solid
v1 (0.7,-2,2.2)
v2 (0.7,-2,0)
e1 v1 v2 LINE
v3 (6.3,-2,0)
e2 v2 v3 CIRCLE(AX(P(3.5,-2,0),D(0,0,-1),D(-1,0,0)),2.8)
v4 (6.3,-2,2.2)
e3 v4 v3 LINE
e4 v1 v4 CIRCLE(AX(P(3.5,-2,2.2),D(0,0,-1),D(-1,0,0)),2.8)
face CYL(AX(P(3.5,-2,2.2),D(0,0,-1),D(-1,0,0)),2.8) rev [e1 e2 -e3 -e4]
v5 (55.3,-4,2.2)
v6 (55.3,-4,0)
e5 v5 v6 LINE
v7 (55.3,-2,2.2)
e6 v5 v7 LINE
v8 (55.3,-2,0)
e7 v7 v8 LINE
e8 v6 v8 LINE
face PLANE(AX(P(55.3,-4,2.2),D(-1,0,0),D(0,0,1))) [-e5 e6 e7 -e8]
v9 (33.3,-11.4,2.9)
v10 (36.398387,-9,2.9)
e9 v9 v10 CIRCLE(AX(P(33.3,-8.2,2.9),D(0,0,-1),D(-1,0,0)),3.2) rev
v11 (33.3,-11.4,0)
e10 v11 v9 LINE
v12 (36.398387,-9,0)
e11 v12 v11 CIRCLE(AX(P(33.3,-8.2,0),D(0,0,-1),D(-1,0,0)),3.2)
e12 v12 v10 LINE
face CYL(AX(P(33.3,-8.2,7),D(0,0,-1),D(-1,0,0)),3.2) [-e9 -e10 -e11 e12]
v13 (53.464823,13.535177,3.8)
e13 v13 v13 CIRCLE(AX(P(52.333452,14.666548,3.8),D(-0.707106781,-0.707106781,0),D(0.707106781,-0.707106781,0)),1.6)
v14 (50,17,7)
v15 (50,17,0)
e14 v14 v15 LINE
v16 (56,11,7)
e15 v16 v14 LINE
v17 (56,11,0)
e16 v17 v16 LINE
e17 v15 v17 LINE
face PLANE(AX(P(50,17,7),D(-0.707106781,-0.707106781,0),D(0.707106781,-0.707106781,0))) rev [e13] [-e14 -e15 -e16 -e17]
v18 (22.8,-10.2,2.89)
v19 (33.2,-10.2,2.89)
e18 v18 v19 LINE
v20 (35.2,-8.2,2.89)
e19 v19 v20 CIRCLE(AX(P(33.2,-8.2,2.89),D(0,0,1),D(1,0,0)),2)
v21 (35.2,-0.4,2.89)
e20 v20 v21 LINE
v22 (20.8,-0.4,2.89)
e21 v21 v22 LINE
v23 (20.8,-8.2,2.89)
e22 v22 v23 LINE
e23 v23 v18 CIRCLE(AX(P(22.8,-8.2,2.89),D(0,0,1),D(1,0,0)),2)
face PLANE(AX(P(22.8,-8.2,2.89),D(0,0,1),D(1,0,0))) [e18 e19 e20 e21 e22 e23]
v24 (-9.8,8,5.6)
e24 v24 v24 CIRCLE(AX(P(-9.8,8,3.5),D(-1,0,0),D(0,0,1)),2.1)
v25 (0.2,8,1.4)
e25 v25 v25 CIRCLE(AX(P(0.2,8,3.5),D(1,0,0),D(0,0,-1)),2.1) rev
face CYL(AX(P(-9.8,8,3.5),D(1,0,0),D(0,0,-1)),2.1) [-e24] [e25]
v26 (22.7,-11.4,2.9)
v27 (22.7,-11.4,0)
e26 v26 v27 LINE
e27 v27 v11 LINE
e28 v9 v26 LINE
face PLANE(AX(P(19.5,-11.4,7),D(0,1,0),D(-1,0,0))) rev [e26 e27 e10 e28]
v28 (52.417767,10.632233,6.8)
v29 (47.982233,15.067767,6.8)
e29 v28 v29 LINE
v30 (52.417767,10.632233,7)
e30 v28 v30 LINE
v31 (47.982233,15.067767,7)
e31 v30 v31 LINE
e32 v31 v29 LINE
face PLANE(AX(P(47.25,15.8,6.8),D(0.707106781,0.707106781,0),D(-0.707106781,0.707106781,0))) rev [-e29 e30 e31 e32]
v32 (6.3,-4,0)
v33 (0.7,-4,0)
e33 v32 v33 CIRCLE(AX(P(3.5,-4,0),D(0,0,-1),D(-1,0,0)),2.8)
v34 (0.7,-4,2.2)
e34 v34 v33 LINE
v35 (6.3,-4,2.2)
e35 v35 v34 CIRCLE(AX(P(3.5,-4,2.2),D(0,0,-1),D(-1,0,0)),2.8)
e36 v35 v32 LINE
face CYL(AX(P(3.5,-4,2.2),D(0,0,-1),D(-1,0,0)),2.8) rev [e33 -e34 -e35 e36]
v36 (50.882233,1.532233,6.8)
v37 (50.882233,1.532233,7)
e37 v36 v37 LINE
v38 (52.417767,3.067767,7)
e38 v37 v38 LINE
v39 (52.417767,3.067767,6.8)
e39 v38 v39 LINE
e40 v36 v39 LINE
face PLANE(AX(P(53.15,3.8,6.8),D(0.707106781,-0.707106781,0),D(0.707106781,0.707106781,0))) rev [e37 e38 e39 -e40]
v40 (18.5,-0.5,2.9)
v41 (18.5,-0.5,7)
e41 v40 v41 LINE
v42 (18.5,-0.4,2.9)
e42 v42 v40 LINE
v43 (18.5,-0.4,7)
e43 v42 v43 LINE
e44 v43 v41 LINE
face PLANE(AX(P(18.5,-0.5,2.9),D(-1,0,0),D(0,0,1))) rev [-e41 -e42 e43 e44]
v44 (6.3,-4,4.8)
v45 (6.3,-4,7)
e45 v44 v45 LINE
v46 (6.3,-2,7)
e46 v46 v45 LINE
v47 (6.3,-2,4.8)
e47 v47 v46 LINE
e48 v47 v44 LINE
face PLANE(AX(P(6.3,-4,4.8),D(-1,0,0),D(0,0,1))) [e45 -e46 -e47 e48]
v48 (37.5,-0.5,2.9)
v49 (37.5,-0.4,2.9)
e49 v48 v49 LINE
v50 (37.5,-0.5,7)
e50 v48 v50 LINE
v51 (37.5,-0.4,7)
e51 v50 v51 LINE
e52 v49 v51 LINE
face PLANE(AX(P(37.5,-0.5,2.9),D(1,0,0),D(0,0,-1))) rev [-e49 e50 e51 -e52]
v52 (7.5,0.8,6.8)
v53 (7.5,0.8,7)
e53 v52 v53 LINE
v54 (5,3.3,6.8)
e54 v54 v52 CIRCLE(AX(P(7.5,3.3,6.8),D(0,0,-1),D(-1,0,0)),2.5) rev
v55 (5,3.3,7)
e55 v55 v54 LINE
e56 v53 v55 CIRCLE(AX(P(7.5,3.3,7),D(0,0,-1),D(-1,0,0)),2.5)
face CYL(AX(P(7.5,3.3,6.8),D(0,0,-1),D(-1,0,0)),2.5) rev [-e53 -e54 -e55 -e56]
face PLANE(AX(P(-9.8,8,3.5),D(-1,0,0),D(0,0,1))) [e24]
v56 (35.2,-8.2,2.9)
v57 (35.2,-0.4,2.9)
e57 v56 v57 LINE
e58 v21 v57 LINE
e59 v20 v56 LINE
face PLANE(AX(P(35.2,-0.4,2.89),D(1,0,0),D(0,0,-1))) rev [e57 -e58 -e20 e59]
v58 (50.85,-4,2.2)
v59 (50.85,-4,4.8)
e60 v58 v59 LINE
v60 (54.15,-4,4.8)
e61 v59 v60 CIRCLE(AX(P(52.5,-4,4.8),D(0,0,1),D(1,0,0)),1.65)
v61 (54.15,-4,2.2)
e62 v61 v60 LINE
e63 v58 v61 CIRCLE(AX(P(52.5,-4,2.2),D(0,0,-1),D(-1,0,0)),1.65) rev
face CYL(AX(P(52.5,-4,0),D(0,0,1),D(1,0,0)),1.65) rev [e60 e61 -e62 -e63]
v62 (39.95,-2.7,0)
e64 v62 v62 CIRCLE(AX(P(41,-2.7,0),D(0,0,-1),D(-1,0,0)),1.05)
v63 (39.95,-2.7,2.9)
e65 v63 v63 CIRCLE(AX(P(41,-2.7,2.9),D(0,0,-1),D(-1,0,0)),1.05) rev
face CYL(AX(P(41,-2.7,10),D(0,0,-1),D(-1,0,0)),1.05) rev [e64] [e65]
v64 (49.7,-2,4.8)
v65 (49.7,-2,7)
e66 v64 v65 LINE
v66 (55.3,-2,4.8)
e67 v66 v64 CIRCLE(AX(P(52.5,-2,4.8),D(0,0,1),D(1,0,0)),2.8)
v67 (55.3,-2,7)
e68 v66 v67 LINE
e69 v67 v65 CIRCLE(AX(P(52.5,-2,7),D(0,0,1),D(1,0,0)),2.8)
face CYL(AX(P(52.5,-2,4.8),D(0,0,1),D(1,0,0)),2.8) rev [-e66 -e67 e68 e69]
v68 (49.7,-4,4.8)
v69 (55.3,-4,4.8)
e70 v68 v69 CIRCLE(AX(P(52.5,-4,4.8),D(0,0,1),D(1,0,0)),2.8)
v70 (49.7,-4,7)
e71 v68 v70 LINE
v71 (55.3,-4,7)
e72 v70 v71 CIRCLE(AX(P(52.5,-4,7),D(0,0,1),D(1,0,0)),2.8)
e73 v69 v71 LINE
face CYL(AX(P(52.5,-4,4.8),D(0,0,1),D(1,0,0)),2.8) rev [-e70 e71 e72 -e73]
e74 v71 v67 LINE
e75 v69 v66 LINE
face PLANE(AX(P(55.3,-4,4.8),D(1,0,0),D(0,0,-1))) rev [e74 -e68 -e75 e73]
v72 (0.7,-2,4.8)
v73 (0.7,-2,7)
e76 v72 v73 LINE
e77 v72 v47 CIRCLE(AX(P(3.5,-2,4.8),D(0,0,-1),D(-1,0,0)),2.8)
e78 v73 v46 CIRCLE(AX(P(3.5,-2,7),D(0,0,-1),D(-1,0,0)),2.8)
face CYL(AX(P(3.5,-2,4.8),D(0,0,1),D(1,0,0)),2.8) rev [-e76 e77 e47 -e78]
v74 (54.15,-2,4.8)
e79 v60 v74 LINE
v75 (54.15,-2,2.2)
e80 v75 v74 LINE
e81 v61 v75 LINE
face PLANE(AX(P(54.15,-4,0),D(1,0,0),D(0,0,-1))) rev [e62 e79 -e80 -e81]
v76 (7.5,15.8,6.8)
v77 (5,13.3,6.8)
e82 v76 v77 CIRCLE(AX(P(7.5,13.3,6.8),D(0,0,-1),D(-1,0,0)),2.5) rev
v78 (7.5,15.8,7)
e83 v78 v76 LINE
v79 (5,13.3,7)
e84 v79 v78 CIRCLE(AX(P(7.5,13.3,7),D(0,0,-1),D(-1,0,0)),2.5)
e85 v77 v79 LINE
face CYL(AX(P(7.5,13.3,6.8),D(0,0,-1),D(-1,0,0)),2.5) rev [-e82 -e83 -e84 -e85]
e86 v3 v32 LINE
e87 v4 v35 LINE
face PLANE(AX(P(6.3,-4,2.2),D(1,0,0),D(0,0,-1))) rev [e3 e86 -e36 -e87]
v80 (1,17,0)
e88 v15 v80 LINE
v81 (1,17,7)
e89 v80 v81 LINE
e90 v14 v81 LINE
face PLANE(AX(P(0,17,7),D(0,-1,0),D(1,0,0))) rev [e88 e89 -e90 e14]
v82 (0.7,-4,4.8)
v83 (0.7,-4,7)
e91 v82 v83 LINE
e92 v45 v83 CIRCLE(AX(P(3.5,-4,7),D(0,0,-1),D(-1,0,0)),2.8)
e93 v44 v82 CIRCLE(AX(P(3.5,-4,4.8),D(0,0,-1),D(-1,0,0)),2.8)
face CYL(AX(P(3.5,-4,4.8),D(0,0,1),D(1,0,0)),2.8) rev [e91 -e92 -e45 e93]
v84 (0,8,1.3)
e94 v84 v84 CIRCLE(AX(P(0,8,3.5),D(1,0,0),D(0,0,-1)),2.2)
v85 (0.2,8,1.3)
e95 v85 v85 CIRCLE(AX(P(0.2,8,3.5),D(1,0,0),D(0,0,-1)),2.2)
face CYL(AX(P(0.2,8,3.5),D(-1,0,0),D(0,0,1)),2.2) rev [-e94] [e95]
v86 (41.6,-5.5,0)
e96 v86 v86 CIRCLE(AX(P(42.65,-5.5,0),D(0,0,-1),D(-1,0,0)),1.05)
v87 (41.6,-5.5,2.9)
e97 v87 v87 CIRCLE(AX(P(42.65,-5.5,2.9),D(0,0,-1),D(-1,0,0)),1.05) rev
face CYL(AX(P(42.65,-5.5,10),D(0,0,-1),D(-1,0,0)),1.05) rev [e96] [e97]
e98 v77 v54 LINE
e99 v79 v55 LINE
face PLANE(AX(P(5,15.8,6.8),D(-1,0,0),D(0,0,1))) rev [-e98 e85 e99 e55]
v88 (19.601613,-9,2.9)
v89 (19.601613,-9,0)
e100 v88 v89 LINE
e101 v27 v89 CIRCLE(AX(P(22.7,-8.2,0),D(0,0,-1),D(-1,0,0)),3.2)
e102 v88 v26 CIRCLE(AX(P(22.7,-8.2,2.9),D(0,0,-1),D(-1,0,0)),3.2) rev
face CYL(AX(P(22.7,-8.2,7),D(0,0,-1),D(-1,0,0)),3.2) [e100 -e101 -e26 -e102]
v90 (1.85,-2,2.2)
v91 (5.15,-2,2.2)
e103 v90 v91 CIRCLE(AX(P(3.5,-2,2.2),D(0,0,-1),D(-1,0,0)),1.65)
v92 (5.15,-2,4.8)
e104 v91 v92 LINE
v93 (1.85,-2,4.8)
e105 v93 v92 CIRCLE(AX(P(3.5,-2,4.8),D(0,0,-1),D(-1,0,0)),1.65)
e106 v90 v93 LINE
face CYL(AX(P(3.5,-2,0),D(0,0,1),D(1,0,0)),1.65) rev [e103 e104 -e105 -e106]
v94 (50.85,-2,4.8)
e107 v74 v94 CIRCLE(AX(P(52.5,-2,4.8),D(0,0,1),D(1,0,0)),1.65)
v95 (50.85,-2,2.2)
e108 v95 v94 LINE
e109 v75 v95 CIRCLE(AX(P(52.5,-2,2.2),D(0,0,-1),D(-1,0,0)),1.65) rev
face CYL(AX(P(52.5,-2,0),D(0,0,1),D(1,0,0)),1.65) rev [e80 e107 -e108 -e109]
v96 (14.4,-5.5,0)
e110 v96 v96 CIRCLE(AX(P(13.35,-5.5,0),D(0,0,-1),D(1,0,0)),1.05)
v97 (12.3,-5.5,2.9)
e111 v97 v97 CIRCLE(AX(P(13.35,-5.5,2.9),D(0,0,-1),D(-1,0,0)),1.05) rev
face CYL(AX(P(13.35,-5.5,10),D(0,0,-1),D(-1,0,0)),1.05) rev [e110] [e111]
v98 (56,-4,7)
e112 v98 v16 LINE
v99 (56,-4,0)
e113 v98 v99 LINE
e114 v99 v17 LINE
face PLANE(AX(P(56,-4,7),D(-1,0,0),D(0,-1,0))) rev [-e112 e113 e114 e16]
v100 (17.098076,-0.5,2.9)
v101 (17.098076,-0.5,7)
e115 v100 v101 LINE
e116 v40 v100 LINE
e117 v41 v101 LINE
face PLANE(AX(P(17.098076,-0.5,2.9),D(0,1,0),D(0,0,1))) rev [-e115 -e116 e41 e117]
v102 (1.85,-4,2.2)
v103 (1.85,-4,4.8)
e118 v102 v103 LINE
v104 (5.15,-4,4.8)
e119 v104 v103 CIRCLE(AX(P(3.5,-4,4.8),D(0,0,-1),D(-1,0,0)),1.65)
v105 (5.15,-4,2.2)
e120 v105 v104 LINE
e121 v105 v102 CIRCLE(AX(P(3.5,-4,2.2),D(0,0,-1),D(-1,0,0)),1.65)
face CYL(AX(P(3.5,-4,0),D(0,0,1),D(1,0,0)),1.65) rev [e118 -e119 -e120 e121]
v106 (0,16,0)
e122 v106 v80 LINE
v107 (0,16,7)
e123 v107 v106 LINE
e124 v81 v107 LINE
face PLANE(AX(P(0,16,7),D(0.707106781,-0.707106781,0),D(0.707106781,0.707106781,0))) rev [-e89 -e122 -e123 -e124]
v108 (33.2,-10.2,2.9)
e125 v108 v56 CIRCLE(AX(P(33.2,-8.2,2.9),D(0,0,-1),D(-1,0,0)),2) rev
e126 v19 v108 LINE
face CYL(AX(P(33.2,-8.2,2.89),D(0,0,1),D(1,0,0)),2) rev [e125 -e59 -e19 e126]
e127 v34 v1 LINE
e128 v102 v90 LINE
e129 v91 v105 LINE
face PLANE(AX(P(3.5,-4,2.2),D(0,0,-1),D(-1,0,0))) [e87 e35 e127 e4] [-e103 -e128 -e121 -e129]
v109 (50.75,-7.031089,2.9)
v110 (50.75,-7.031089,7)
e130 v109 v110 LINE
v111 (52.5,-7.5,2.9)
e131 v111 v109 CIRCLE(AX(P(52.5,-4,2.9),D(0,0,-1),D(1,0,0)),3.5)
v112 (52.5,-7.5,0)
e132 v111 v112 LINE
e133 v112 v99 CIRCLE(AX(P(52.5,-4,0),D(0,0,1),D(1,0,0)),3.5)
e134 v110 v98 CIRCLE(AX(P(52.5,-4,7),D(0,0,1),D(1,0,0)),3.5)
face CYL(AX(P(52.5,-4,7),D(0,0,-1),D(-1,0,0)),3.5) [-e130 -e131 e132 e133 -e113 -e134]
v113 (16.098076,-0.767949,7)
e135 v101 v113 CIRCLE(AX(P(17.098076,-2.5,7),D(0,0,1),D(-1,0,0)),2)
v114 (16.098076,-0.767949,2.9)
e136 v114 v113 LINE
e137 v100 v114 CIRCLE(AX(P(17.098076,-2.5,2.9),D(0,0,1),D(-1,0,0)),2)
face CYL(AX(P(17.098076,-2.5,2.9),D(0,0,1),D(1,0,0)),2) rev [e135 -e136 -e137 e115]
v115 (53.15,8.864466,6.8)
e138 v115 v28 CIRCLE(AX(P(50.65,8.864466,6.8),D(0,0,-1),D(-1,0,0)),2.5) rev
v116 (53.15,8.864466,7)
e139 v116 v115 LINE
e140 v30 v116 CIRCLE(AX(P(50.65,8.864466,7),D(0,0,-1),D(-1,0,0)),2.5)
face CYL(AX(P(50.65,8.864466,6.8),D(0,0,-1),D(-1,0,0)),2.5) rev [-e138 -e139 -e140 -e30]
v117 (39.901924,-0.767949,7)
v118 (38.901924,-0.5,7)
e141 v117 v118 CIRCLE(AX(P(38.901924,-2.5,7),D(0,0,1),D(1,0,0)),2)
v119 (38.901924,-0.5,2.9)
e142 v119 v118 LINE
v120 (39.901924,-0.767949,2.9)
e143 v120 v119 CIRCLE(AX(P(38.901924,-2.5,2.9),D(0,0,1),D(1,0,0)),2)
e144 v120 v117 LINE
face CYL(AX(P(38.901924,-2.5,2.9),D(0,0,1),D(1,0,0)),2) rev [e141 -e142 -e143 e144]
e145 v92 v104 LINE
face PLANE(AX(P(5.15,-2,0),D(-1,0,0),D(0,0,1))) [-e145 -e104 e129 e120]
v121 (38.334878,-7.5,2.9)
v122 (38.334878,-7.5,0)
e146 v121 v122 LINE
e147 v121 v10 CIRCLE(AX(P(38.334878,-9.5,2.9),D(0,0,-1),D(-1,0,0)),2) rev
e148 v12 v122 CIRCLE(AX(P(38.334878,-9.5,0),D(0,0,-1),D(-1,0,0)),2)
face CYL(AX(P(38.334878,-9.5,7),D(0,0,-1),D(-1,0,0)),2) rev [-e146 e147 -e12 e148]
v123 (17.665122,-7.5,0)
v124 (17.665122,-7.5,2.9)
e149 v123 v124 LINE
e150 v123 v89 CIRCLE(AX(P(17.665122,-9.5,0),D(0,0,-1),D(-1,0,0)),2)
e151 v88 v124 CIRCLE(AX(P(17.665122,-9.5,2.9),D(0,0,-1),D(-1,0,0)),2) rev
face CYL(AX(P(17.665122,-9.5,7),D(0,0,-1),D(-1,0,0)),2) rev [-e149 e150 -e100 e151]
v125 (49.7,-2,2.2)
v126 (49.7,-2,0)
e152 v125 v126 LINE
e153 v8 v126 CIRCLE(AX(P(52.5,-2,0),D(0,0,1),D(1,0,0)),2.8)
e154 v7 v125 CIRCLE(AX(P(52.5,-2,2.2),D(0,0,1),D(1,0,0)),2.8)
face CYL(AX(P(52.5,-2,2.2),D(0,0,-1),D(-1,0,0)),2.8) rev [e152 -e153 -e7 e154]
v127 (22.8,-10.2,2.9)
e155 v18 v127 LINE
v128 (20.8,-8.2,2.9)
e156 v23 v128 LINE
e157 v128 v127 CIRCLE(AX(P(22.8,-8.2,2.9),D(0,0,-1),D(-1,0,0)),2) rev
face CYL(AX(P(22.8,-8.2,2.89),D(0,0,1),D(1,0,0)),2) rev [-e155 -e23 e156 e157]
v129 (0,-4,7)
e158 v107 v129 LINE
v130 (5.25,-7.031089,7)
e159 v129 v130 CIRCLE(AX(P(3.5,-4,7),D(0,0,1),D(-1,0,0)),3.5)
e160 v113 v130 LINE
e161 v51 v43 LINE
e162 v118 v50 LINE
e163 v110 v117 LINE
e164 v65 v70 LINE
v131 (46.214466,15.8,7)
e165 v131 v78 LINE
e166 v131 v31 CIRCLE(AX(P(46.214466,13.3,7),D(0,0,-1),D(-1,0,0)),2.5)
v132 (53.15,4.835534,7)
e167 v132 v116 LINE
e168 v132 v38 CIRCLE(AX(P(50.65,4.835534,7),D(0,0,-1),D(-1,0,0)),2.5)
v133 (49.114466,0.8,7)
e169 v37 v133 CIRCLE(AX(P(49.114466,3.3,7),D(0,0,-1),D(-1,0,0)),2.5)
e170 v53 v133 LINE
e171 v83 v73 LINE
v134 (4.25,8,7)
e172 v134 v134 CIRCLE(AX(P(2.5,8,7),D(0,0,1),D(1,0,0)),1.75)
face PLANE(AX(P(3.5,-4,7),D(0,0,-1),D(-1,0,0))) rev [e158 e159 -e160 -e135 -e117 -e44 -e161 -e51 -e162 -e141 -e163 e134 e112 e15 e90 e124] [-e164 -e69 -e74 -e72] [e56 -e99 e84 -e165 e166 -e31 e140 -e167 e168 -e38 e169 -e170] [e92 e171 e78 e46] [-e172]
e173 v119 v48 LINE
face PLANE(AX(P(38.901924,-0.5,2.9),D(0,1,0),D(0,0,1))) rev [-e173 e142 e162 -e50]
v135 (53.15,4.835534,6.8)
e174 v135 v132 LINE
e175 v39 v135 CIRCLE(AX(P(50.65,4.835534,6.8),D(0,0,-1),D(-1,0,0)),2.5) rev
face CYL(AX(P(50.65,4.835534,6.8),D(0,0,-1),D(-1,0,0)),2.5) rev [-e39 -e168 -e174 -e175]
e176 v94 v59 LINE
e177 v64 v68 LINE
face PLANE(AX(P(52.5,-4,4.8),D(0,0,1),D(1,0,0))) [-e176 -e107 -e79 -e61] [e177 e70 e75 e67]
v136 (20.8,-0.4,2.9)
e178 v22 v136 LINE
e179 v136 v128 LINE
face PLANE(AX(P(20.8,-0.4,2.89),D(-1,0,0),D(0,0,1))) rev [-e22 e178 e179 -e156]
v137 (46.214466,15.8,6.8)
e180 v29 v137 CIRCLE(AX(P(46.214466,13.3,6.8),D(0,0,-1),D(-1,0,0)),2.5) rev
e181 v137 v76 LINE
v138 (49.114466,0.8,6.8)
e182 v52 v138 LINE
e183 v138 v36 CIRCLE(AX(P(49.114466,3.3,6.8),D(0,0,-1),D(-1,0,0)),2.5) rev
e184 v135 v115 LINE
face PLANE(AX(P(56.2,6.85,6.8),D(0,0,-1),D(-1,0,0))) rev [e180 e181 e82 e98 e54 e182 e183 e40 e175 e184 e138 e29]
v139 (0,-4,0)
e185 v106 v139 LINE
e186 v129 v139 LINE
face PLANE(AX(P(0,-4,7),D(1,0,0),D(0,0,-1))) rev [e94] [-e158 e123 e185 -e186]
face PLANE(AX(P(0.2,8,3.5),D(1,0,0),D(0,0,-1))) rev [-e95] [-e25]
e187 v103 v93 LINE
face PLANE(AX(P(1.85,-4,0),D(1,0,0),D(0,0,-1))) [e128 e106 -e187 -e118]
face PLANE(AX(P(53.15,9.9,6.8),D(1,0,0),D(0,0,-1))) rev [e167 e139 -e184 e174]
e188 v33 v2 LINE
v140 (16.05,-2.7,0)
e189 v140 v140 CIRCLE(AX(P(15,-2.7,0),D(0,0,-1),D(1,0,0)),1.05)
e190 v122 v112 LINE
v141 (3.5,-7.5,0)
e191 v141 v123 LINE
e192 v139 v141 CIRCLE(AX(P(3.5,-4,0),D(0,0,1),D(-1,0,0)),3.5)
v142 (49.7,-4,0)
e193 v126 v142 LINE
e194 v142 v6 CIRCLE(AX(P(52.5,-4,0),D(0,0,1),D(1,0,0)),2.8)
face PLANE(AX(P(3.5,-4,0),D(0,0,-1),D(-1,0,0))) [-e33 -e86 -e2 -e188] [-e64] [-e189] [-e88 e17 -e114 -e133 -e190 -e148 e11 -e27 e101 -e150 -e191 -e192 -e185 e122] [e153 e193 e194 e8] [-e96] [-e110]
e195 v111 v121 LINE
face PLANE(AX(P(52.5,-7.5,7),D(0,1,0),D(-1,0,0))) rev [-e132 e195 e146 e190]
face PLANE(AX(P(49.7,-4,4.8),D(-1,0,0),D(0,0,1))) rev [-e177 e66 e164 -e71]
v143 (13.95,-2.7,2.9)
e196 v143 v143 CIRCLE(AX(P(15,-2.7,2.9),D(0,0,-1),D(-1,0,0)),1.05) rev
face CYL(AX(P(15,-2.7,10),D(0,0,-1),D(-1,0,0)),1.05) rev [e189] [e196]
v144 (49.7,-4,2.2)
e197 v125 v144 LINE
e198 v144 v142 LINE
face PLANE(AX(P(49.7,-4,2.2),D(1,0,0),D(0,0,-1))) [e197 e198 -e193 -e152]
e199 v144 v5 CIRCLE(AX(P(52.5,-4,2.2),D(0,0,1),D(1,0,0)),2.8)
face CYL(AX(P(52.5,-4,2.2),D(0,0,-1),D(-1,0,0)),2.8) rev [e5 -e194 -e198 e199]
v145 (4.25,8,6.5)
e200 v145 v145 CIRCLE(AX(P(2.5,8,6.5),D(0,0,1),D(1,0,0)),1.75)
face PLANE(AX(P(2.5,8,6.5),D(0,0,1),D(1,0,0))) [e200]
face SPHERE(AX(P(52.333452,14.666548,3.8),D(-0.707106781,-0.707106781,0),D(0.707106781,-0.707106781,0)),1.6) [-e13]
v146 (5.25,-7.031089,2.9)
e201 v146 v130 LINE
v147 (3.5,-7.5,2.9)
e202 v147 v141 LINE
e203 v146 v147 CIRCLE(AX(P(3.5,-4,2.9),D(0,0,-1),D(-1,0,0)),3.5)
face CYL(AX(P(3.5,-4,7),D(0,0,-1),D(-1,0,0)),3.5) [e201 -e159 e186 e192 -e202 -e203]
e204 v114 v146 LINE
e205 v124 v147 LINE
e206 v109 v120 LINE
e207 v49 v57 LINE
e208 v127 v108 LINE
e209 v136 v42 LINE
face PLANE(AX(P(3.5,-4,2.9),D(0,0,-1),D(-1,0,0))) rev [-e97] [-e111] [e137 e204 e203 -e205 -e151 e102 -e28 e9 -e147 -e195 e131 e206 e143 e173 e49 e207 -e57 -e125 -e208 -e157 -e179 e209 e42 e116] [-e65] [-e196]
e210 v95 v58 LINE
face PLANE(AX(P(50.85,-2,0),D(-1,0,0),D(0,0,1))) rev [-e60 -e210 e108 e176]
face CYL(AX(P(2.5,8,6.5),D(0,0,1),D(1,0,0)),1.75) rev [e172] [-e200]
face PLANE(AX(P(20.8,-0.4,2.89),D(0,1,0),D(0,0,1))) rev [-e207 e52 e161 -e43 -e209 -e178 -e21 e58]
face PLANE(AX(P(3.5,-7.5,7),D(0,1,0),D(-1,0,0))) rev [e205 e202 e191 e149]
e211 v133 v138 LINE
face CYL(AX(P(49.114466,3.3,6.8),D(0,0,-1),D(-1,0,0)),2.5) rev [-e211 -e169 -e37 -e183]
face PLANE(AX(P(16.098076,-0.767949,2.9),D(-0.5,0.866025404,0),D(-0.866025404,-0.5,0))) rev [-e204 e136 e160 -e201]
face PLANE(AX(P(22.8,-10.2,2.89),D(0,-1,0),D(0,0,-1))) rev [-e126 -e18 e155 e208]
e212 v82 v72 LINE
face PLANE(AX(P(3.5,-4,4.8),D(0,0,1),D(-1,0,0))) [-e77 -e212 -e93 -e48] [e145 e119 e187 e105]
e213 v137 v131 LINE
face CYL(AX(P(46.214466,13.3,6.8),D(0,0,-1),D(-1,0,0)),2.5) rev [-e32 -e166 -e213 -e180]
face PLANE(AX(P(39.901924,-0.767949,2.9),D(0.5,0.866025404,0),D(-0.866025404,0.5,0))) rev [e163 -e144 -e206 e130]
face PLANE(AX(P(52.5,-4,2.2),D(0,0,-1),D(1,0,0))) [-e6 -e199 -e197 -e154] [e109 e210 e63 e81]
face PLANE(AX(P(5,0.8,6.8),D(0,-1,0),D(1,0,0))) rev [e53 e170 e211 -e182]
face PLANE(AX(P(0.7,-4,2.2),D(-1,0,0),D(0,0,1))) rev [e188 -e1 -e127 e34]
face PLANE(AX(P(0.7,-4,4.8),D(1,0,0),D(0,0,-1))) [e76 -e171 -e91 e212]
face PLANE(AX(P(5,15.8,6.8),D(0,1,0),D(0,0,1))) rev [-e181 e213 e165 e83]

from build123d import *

# Parameters (mm, degrees)
BOSS_EXTRUDE1_DEPTH  = 7
CUT_EXTRUDE1_DEPTH   = 0.2
FILLET1_R            = 2.5
CHAMFER1_SIZE        = 6
CUT_EXTRUDE4_DEPTH   = 2.2
CUT_EXTRUDE5_DEPTH   = 59.720013624
SKETCH14_R           = 2.2
CUT_EXTRUDE9_DEPTH   = 0.2
CUT_EXTRUDE10_DEPTH  = 4.11
CHAMFER3_SIZE        = 1
FILLET3_R            = 3.2
SKETCH29_R           = 1.05
CUT_EXTRUDE16_DEPTH  = 10
FILLET5_R            = 2
FILLET6_R            = 2
MIRROR2_COPY_1_DEPTH = 2.2
SKETCH31_R           = 1.75
CUT_EXTRUDE17_DEPTH  = 0.5
CUT_EXTRUDE19_START  = -4.1
CUT_EXTRUDE19_DEPTH  = 4.1
SKETCH33_R           = 2.1
BOSS_EXTRUDE2_DEPTH  = 10


with BuildPart() as part:
    # Sketch1 → Boss-Extrude1 (new body)
    with BuildSketch(Plane.XY):
        with BuildLine():
            Line((0, -4), (0, 17))
            Line((0, 17), (56, 17))
            Line((56, 17), (56, -4))
            ThreePointArc((56, -4), (54.974873734, -6.474873734), (52.5, -7.5))
            Line((52.5, -7.5), (36.5, -7.5))
            Line((36.5, -7.5), (36.5, -11.4))
            Line((36.5, -11.4), (19.5, -11.4))
            Line((19.5, -11.4), (19.5, -7.5))
            Line((19.5, -7.5), (3.5, -7.5))
            ThreePointArc((3.5, -7.5), (1.025126266, -6.474873734), (0, -4))
        make_face()
    extrude(amount=BOSS_EXTRUDE1_DEPTH)

    # Sketch2 → Cut-Extrude1 (cut)
    with BuildSketch(Plane.XY.offset(7)):
        Polygon((5, 15.8), (5, 0.8), (50.15, 0.8), (53.15, 3.8), (53.15, 9.9), (47.25, 15.8), align=None)
    extrude(amount=-CUT_EXTRUDE1_DEPTH, mode=Mode.SUBTRACT)

    # Fillet1
    fillet1_edges = [part.edges().sort_by_distance(p)[0] for p in [
        (47.25, 15.8, 6.9),
        (53.15, 9.9, 6.9),
        (53.15, 3.8, 6.9),
        (50.15, 0.8, 6.9),
        (5, 0.8, 6.9),
        (5, 15.8, 6.9),
    ]]
    fillet(fillet1_edges, radius=FILLET1_R)

    # Chamfer1
    chamfer1_edges = [part.edges().sort_by_distance(p)[0] for p in [
        (56, 17, 3.5),
    ]]
    chamfer(chamfer1_edges, length=CHAMFER1_SIZE)

    # Sketch6 → Cut-Extrude4 (cut)
    with BuildSketch(Plane.XY.offset(7)):
        with BuildLine():
            Line((49.7, -4), (49.7, -2))
            ThreePointArc((49.7, -2), (52.5, 0.8), (55.3, -2))
            Line((55.3, -2), (55.3, -4))
            ThreePointArc((55.3, -4), (52.5, -6.8), (49.7, -4))
        make_face()
    cut_extrude4 = extrude(amount=-CUT_EXTRUDE4_DEPTH, mode=Mode.SUBTRACT)

    # Sketch9 → Cut-Extrude5 (cut, through all)
    with BuildSketch(Plane.XY.offset(4.8)):
        with BuildLine():
            Line((54.15, -4), (54.15, -2))
            ThreePointArc((54.15, -2), (52.5, -0.35), (50.85, -2))
            Line((50.85, -2), (50.85, -4))
            ThreePointArc((50.85, -4), (52.5, -5.65), (54.15, -4))
        make_face()
    cut_extrude5 = extrude(amount=-CUT_EXTRUDE5_DEPTH, mode=Mode.SUBTRACT)

    # Mirror1: Cut-Extrude4 across plane
    add(cut_extrude4.mirror(Plane.XY.offset(3.5)), mode=Mode.SUBTRACT)

    # Sketch14 → Cut-Extrude9 (cut)
    with BuildSketch(Plane(origin=(0, 24, 0), x_dir=(0, -1, 0), z_dir=(1, 0, 0))):
        with Locations(Location((16, -3.5, 0), (0, 0, 90))):
            Circle(SKETCH14_R)
    extrude(amount=CUT_EXTRUDE9_DEPTH, mode=Mode.SUBTRACT)

    # Sketch19 → Cut-Extrude10 (cut)
    with BuildSketch(Plane.XY.offset(7)):
        with BuildLine():
            Line((20.8, -0.4), (35.2, -0.4))
            Line((35.2, -0.4), (35.2, -8.2))
            ThreePointArc((35.2, -8.2), (34.614213562, -9.614213562), (33.2, -10.2))
            Line((33.2, -10.2), (22.8, -10.2))
            ThreePointArc((22.8, -10.2), (21.385786438, -9.614213562), (20.8, -8.2))
            Line((20.8, -8.2), (20.8, -0.4))
        make_face()
    extrude(amount=-CUT_EXTRUDE10_DEPTH, mode=Mode.SUBTRACT)

    # Chamfer3
    chamfer3_edges = [part.edges().sort_by_distance(p)[0] for p in [
        (0, 17, 3.5),
    ]]
    chamfer(chamfer3_edges, length=CHAMFER3_SIZE)

    # Fillet3
    fillet3_edges = [part.edges().sort_by_distance(p)[0] for p in [
        (36.5, -11.4, 3.5),
        (19.5, -11.4, 3.5),
    ]]
    fillet(fillet3_edges, radius=FILLET3_R)

    # Sketch29 → Cut-Extrude16 (cut)
    with BuildSketch(Plane(origin=(0, 0, 0), x_dir=(-1, 0, 0), z_dir=(0, 0, -1))):
        with Locations((-42.65, -5.5)):
            Circle(SKETCH29_R)
        with Locations((-41, -2.7)):
            Circle(SKETCH29_R)
        with Locations((-13.35, -5.5)):
            Circle(SKETCH29_R)
        with Locations((-15, -2.7)):
            Circle(SKETCH29_R)
    extrude(amount=-CUT_EXTRUDE16_DEPTH, mode=Mode.SUBTRACT)

    # Fillet5
    # the kernel refuses this fillet: 2 mm, written as the material it adds along each edge
    with BuildSketch(Plane(origin=(19.5, -7.5, 0), x_dir=(0.06758731351152399, -0.9977133631721562, 0), z_dir=(0, 0, 1))) as fillet5_piece_1:
        with BuildLine():
            CenterArc((1.871412228, -1.965857277), FILLET5_R, 100.602090028, 75.522487814)
            Line((-0.124014498, -1.83068265), (-0.323557171, -1.817165187))
            Line((-0.323557171, -1.817165187), (-0.199542673, 0.013517463))
            Line((-0.199542673, 0.013517463), (0.013517463, 0.199542673))
            ThreePointArc((0.013517463, 0.199542673), (0.711916817, 0.152231553), (1.466640375, 0.196585728))
            Line((1.466640375, 0.196585728), (1.503437816, 0))
        make_face()
    extrude(amount=7)
    # the kernel refuses this fillet: 2 mm, written as the material it takes off along each edge

    # Fillet6
    # the kernel refuses this fillet: 2 mm, written as the material it adds along each edge
    with BuildSketch(Plane(origin=(36.5, -7.5, 0), x_dir=(-0.06758731351152392, -0.9977133631721562, 0), z_dir=(0, 0, 1))) as fillet6_piece_1:
        with BuildLine():
            CenterArc((1.871412228, 1.965857277), FILLET6_R, 183.875422158, 75.522487814)
            Line((-0.124014498, 1.83068265), (-0.323557171, 1.817165187))
            Line((-0.323557171, 1.817165187), (-0.199542673, -0.013517463))
            Line((-0.199542673, -0.013517463), (0.013517463, -0.199542673))
            ThreePointArc((0.013517463, -0.199542673), (0.711916817, -0.152231553), (1.466640375, -0.196585728))
            Line((1.466640375, -0.196585728), (1.503437816, 0))
        make_face()
    extrude(amount=7)
    # the kernel refuses this fillet: 2 mm, written as the material it takes off along each edge

    # Mirror2: Cut-Extrude4, Cut-Extrude5 across plane
    add(cut_extrude4.mirror(Plane.ZY.offset(-28)), mode=Mode.SUBTRACT)
    add(cut_extrude5.mirror(Plane.ZY.offset(-28)), mode=Mode.SUBTRACT)

    # Mirror2 copy 1 sketch → Mirror2 copy 1 (cut)
    with BuildSketch(Plane(origin=(56, 0, 0), x_dir=(-1, 0, 0), z_dir=(0, 0, -1))):
        with BuildLine():
            Line((49.7, -4), (49.7, -2))
            ThreePointArc((49.7, -2), (52.5, 0.8), (55.3, -2))
            Line((55.3, -2), (55.3, -4))
            ThreePointArc((55.3, -4), (52.5, -6.8), (49.7, -4))
        make_face()
    extrude(amount=-MIRROR2_COPY_1_DEPTH, mode=Mode.SUBTRACT)

    # Sketch31 → Cut-Extrude17 (cut)
    with BuildSketch(Plane.XY.offset(7)):
        with Locations((2.5, 8)):
            Circle(SKETCH31_R)
    extrude(amount=-CUT_EXTRUDE17_DEPTH, mode=Mode.SUBTRACT)

    # Sketch28 → Cut-Extrude19 (cut)
    with BuildSketch(Plane.XY.offset(7).offset(CUT_EXTRUDE19_START)):
        with BuildLine():
            Line((16.098076211, -0.767949192), (5.25, -7.031088913))
            ThreePointArc((5.25, -7.031088913), (4.405866658, -7.380740392), (3.5, -7.5))
            Line((3.5, -7.5), (16.682429586, -7.5))
            ThreePointArc((16.682429586, -7.5), (17.389536367, -7.792893219), (17.682429586, -8.5))
            Line((17.682429586, -8.5), (17.682429586, -14.577281055))
            Line((17.682429586, -14.577281055), (38.317570414, -14.577281055))
            Line((38.317570414, -14.577281055), (38.317570414, -8.5))
            ThreePointArc((38.317570414, -8.5), (38.610463633, -7.792893219), (39.317570414, -7.5))
            Line((39.317570414, -7.5), (52.5, -7.5))
            ThreePointArc((52.5, -7.5), (51.594133342, -7.380740392), (50.75, -7.031088913))
            Line((50.75, -7.031088913), (39.901923789, -0.767949192))
            ThreePointArc((39.901923789, -0.767949192), (39.419561879, -0.568148347), (38.901923789, -0.5))
            Line((38.901923789, -0.5), (37.5, -0.5))
            Line((37.5, -0.5), (37.5, -0.4))
            Line((37.5, -0.4), (18.5, -0.4))
            Line((18.5, -0.4), (18.5, -0.5))
            Line((18.5, -0.5), (17.098076211, -0.5))
            ThreePointArc((17.098076211, -0.5), (16.580438121, -0.568148347), (16.098076211, -0.767949192))
        make_face()
    extrude(amount=CUT_EXTRUDE19_DEPTH, mode=Mode.SUBTRACT)

    # Sketch32 → Revolve1 (revolve)
    with BuildSketch(Plane(origin=(0, 0, 3.8), x_dir=(-1, 0, 0), z_dir=(0, 0, -1))):
        with BuildLine():
            Line((-52.333452378, 14.666547622), (-53.464823228, 13.535176772))
            ThreePointArc((-53.464823228, 13.535176772), (-53.933452378, 14.666547622), (-53.464823228, 15.797918472))
            Line((-53.464823228, 15.797918472), (-52.333452378, 14.666547622))
        make_face()
    revolve(axis=Axis((52.333452378, 14.666547622, 3.8), (0.7071067811865478, 0.7071067811865472, 0)))

    # Sketch33 → Boss-Extrude2 (add)
    with BuildSketch(Plane.ZY.offset(-0.2)):
        with Locations(Location((3.5, 8, 0), (0, 0, 180))):
            Circle(SKETCH33_R)
    extrude(amount=BOSS_EXTRUDE2_DEPTH)


solid = part.part
